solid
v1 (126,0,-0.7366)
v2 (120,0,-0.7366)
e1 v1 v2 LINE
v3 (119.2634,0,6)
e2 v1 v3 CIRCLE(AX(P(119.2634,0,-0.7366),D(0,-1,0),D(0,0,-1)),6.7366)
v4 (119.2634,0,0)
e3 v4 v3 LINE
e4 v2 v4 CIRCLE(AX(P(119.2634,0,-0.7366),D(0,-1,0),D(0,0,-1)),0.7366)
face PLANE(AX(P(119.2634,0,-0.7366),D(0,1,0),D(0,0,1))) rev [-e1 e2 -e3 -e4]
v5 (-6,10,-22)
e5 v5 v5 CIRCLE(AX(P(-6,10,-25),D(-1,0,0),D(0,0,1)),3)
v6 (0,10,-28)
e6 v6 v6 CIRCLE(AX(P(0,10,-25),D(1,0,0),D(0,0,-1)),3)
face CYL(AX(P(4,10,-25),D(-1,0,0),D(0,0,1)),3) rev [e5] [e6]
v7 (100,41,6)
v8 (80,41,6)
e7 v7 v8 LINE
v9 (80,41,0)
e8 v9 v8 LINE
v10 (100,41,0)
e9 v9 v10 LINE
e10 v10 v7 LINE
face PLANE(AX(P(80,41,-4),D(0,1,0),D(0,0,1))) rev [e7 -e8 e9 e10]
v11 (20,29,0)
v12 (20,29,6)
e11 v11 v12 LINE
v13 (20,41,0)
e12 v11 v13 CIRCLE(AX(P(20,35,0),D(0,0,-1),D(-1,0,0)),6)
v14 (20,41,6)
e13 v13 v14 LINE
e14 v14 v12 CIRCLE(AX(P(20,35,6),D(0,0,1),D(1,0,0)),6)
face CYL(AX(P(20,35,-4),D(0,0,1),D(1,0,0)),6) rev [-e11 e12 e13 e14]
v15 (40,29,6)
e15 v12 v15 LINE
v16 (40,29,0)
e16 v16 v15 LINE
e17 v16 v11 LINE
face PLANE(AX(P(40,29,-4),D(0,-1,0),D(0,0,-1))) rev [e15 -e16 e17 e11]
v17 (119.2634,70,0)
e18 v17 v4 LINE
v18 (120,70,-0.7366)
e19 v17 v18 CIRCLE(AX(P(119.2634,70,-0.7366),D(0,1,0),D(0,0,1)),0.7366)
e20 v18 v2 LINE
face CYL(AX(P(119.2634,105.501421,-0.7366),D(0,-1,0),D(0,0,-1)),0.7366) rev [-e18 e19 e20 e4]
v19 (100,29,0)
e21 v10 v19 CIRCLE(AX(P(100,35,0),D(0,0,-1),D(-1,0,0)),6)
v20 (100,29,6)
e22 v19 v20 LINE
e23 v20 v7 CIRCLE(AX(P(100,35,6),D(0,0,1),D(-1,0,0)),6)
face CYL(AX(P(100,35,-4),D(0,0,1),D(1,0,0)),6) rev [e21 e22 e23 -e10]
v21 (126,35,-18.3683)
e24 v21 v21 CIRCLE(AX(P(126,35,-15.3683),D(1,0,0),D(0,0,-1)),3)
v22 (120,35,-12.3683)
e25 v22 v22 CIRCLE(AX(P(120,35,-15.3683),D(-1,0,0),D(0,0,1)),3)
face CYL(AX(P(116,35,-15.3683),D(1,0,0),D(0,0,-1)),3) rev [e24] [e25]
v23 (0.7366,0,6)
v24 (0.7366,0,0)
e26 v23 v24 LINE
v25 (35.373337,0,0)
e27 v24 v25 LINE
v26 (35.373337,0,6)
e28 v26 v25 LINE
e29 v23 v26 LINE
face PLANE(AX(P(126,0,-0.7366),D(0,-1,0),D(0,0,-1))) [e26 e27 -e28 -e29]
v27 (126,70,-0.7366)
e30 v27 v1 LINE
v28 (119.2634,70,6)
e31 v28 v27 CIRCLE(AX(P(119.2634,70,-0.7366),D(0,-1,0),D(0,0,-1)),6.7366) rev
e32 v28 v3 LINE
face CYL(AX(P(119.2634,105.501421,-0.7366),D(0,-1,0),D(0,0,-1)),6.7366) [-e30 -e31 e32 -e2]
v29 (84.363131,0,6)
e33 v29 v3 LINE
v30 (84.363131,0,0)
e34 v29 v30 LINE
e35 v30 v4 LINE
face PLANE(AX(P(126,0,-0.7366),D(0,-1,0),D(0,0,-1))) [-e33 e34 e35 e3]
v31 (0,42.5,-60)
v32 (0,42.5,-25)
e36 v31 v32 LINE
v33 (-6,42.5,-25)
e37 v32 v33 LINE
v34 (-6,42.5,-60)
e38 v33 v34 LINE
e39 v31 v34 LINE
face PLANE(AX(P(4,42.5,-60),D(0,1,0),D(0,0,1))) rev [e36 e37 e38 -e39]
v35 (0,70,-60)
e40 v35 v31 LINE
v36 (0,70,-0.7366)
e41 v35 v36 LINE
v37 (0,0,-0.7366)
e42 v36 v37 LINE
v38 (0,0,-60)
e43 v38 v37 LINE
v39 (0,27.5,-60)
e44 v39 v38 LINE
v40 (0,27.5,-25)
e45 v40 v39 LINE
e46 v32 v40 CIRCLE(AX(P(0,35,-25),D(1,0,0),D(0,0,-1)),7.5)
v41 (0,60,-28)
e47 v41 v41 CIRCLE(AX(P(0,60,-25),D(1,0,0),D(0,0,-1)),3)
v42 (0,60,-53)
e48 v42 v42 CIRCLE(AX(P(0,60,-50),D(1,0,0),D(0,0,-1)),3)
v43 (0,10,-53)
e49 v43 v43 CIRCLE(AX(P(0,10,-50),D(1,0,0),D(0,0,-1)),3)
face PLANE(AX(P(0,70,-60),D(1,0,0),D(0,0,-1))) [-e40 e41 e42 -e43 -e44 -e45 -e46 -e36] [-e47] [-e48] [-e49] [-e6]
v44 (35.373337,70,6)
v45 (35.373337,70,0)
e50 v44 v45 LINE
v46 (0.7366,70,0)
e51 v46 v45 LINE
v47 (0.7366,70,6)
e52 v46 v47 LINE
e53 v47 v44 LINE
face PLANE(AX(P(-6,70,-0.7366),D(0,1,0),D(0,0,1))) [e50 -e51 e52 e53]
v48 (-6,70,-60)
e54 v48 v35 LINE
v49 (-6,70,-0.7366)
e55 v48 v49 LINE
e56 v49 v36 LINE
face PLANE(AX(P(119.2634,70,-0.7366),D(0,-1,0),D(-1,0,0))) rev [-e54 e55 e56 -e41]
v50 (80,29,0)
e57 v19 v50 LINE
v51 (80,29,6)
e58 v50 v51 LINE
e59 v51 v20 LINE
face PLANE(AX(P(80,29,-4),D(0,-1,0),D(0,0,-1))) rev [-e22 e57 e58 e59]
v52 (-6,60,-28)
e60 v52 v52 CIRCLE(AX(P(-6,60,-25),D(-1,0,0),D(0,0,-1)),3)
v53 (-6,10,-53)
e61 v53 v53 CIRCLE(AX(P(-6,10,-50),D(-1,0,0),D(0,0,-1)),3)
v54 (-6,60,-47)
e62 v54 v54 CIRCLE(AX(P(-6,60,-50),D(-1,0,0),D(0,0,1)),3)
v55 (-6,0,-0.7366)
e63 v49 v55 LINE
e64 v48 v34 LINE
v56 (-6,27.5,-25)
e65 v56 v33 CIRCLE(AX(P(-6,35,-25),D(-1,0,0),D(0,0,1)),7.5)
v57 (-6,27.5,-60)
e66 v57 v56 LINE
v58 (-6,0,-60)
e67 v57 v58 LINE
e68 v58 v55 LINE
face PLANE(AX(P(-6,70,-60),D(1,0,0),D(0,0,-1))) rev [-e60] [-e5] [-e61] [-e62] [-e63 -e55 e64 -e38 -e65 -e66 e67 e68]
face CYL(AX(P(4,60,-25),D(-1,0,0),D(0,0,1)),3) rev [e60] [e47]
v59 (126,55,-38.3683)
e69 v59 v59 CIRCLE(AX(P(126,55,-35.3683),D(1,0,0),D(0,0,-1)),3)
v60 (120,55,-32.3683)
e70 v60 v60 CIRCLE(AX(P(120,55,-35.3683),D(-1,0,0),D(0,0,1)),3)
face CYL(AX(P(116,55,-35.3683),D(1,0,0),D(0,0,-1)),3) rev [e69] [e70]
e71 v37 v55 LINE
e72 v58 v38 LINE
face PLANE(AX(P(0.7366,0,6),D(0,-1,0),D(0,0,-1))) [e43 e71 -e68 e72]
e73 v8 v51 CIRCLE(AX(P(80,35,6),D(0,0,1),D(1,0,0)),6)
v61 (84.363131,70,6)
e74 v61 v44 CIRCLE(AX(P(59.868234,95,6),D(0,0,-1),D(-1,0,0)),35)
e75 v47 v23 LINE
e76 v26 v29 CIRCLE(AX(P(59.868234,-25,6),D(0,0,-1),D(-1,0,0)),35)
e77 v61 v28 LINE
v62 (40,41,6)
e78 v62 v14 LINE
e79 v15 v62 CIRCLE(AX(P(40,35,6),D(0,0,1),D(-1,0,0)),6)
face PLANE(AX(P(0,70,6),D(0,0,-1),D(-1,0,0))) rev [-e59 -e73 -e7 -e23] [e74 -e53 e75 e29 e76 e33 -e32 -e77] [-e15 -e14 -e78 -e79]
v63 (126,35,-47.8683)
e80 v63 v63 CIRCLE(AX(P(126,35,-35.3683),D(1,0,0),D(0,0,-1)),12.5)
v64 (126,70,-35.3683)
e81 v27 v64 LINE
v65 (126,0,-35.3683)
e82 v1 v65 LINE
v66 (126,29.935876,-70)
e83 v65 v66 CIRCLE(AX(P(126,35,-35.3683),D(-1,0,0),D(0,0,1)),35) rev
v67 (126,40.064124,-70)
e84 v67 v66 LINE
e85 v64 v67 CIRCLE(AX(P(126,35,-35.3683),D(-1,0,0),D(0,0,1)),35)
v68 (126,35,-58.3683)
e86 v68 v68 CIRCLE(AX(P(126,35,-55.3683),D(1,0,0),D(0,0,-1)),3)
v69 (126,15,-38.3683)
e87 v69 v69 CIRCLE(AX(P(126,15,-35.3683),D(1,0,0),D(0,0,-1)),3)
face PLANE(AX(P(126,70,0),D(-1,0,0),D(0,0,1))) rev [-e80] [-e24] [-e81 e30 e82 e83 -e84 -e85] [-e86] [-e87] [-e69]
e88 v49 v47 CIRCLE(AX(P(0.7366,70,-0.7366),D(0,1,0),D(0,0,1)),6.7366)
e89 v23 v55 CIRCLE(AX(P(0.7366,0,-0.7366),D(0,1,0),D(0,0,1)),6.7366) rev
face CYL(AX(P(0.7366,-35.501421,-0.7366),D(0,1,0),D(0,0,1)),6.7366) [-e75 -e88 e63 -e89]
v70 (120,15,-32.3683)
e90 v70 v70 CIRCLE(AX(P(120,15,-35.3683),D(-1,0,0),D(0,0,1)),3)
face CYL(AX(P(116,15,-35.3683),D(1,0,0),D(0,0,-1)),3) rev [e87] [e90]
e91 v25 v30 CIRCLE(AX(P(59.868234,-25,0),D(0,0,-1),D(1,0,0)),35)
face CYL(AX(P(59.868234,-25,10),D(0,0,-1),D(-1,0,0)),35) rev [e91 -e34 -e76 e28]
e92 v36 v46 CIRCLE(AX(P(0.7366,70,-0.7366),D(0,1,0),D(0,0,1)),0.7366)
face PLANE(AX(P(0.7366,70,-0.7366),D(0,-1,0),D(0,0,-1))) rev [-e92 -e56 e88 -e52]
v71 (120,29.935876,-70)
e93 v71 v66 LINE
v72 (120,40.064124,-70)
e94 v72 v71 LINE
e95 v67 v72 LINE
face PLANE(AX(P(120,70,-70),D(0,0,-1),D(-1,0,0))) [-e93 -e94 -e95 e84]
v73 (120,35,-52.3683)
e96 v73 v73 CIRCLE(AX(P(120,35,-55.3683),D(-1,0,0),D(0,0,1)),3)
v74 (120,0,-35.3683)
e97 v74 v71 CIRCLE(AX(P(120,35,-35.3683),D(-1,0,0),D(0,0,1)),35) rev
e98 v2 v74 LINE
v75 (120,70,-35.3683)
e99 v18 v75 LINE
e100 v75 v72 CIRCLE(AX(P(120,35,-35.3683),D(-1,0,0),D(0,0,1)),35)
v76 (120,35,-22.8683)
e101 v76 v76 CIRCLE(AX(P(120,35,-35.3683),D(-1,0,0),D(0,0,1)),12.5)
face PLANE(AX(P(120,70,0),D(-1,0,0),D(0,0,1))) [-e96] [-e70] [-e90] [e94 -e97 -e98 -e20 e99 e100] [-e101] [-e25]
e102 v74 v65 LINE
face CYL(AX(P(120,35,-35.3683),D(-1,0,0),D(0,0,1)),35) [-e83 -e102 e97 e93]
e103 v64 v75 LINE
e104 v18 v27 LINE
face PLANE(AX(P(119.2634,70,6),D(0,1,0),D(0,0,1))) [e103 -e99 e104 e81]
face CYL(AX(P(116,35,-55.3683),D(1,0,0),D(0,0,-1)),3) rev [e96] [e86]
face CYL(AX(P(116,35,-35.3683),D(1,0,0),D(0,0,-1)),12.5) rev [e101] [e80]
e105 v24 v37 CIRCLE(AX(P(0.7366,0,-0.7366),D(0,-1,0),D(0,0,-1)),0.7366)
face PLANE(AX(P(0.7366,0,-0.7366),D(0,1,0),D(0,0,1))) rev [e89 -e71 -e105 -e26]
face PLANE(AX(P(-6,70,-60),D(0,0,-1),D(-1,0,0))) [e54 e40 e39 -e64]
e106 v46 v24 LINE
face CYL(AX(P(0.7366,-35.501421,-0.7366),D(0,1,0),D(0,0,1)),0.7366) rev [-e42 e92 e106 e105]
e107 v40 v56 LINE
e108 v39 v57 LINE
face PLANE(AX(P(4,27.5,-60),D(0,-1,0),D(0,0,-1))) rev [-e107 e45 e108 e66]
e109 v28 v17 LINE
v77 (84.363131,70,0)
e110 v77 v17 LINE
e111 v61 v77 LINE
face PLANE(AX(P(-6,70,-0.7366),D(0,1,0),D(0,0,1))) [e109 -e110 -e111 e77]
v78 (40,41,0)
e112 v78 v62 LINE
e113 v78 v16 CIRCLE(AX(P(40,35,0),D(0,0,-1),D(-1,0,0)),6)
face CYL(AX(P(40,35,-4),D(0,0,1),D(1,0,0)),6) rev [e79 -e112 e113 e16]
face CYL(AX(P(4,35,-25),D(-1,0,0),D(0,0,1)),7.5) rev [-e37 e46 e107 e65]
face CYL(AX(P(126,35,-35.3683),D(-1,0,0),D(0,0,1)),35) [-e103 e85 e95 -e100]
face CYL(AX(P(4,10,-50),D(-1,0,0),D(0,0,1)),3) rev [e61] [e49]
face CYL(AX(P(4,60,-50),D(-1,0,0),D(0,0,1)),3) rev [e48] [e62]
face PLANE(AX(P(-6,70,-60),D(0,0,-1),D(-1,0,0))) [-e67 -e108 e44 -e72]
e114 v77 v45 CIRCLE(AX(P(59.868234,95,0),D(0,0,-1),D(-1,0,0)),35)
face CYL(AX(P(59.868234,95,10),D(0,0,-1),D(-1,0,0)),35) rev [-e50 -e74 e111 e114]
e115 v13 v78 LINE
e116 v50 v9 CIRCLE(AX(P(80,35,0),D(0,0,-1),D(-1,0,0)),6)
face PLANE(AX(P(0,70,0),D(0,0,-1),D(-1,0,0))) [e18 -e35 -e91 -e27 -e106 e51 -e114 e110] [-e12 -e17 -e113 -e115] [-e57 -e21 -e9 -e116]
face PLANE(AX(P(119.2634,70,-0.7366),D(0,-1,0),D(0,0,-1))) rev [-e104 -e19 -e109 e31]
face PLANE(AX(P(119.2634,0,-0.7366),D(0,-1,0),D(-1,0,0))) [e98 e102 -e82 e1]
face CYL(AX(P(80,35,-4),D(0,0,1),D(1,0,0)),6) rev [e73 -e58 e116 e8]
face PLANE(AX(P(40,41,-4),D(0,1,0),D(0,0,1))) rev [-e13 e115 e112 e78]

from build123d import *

# Parameters (mm, degrees)
BASE_FLANGE1_DEPTH = 70
CUT_EXTRUDE1_DEPTH = 10
CUT_EXTRUDE3_START = -6
CUT_EXTRUDE3_DEPTH = 6
SKETCH8_R          = 12.5
SKETCH8_R_2        = 3
CUT_EXTRUDE4_DEPTH = 10
CUT_EXTRUDE6_DEPTH = 10
SKETCH12_R         = 3
CUT_EXTRUDE7_DEPTH = 10


# Read off the part's stored shape, not the designer's step: Cut-Extrude3
# Sheet-metal steps are written as plain solids
with BuildPart() as part:
    # Sketch1 → Base-Flange1 (new body)
    with BuildSketch(Plane(origin=(0, 0, 0), x_dir=(1, 0, 0), z_dir=(0, 1, 0))):
        with BuildLine():
            Line((0, 60), (0, 0.7366))
            ThreePointArc((0, 0.7366), (0.215745145, 0.215745145), (0.7366, 0))
            Line((0.7366, 0), (119.2634, 0))
            ThreePointArc((119.2634, 0), (119.784254855, 0.215745145), (120, 0.7366))
            Line((120, 0.7366), (120, 70))
            Line((120, 70), (126, 70))
            Line((126, 70), (126, 0.7366))
            ThreePointArc((126, 0.7366), (124.026895542, -4.026895542), (119.2634, -6))
            Line((119.2634, -6), (0.7366, -6))
            ThreePointArc((0.7366, -6), (-4.026895542, -4.026895542), (-6, 0.7366))
            Line((-6, 0.7366), (-6, 60))
            Line((-6, 60), (0, 60))
        make_face()
    extrude(amount=BASE_FLANGE1_DEPTH)

    # Sketch6 → Cut-Extrude1 (cut)
    with BuildSketch(Plane.XY.offset(6)):
        with BuildLine():
            Line((40, 29), (20, 29))
            ThreePointArc((20, 29), (14, 35), (20, 41))
            Line((20, 41), (40, 41))
            ThreePointArc((40, 41), (46, 35), (40, 29))
        make_face()
        with BuildLine():
            Line((80, 41), (100, 41))
            ThreePointArc((100, 41), (106, 35), (100, 29))
            Line((100, 29), (80, 29))
            ThreePointArc((80, 29), (74, 35), (80, 41))
        make_face()
    extrude(amount=-CUT_EXTRUDE1_DEPTH, mode=Mode.SUBTRACT)

    # Cut-Extrude3 outline → Cut-Extrude3 (cut)
    with BuildSketch(Plane(origin=(126, 0, 0), x_dir=(0, 0, -1), z_dir=(1, 0, 0)).offset(CUT_EXTRUDE3_START)):
        with BuildLine():
            Line((70, 0), (70, 29.935875682))
            ThreePointArc((70, 29.935875682), (58.256677497, 8.521288257), (35.3683, 0))
            Line((35.3683, 0), (70, 0))
        make_face()
        with BuildLine():
            ThreePointArc((35.3683, 70), (58.256677497, 61.478711743), (70, 40.064124318))
            Line((70, 40.064124318), (70, 70))
            Line((70, 70), (35.3683, 70))
        make_face()
    extrude(amount=CUT_EXTRUDE3_DEPTH, mode=Mode.SUBTRACT)

    # Sketch8 → Cut-Extrude4 (cut)
    with BuildSketch(Plane(origin=(126, 0, 0), x_dir=(0, 0, -1), z_dir=(1, 0, 0))):
        with Locations((35.3683, 35)):
            Circle(SKETCH8_R)
        with Locations((35.3683, 55)):
            Circle(SKETCH8_R_2)
        with Locations((55.3683, 35)):
            Circle(SKETCH8_R_2)
        with Locations((35.3683, 15)):
            Circle(SKETCH8_R_2)
        with Locations((15.3683, 35)):
            Circle(SKETCH8_R_2)
    extrude(amount=-CUT_EXTRUDE4_DEPTH, mode=Mode.SUBTRACT)

    # Sketch9 → Cut-Extrude6 (cut)
    with BuildSketch(Plane(origin=(0, 0, 0), x_dir=(-1, 0, 0), z_dir=(0, 0, -1))):
        with BuildLine():
            Line((-84.363131417, 70), (-35.373336561, 70))
            ThreePointArc((-35.373336561, 70), (-59.868233989, 60), (-84.363131417, 70))
        make_face()
        with BuildLine():
            Line((-84.363131417, 0), (-35.373336561, 0))
            ThreePointArc((-35.373336561, 0), (-59.868233989, 10), (-84.363131417, 0))
        make_face()
    extrude(amount=-CUT_EXTRUDE6_DEPTH, mode=Mode.SUBTRACT)

    # Sketch12 → Cut-Extrude7 (cut)
    with BuildSketch(Plane.ZY.offset(6)):
        with Locations((-50, 60)):
            Circle(SKETCH12_R)
        with Locations(Location((-25, 60, 0), (0, 0, 180))):
            Circle(SKETCH12_R)
        with Locations((-25, 10)):
            Circle(SKETCH12_R)
        with Locations(Location((-50, 10, 0), (0, 0, 180))):
            Circle(SKETCH12_R)
        with BuildLine():
            Line((-60, 42.5), (-25, 42.5))
            ThreePointArc((-25, 42.5), (-17.5, 35), (-25, 27.5))
            Line((-25, 27.5), (-60, 27.5))
            Line((-60, 27.5), (-60, 42.5))
        make_face()
    extrude(amount=-CUT_EXTRUDE7_DEPTH, mode=Mode.SUBTRACT)


solid = part.part
